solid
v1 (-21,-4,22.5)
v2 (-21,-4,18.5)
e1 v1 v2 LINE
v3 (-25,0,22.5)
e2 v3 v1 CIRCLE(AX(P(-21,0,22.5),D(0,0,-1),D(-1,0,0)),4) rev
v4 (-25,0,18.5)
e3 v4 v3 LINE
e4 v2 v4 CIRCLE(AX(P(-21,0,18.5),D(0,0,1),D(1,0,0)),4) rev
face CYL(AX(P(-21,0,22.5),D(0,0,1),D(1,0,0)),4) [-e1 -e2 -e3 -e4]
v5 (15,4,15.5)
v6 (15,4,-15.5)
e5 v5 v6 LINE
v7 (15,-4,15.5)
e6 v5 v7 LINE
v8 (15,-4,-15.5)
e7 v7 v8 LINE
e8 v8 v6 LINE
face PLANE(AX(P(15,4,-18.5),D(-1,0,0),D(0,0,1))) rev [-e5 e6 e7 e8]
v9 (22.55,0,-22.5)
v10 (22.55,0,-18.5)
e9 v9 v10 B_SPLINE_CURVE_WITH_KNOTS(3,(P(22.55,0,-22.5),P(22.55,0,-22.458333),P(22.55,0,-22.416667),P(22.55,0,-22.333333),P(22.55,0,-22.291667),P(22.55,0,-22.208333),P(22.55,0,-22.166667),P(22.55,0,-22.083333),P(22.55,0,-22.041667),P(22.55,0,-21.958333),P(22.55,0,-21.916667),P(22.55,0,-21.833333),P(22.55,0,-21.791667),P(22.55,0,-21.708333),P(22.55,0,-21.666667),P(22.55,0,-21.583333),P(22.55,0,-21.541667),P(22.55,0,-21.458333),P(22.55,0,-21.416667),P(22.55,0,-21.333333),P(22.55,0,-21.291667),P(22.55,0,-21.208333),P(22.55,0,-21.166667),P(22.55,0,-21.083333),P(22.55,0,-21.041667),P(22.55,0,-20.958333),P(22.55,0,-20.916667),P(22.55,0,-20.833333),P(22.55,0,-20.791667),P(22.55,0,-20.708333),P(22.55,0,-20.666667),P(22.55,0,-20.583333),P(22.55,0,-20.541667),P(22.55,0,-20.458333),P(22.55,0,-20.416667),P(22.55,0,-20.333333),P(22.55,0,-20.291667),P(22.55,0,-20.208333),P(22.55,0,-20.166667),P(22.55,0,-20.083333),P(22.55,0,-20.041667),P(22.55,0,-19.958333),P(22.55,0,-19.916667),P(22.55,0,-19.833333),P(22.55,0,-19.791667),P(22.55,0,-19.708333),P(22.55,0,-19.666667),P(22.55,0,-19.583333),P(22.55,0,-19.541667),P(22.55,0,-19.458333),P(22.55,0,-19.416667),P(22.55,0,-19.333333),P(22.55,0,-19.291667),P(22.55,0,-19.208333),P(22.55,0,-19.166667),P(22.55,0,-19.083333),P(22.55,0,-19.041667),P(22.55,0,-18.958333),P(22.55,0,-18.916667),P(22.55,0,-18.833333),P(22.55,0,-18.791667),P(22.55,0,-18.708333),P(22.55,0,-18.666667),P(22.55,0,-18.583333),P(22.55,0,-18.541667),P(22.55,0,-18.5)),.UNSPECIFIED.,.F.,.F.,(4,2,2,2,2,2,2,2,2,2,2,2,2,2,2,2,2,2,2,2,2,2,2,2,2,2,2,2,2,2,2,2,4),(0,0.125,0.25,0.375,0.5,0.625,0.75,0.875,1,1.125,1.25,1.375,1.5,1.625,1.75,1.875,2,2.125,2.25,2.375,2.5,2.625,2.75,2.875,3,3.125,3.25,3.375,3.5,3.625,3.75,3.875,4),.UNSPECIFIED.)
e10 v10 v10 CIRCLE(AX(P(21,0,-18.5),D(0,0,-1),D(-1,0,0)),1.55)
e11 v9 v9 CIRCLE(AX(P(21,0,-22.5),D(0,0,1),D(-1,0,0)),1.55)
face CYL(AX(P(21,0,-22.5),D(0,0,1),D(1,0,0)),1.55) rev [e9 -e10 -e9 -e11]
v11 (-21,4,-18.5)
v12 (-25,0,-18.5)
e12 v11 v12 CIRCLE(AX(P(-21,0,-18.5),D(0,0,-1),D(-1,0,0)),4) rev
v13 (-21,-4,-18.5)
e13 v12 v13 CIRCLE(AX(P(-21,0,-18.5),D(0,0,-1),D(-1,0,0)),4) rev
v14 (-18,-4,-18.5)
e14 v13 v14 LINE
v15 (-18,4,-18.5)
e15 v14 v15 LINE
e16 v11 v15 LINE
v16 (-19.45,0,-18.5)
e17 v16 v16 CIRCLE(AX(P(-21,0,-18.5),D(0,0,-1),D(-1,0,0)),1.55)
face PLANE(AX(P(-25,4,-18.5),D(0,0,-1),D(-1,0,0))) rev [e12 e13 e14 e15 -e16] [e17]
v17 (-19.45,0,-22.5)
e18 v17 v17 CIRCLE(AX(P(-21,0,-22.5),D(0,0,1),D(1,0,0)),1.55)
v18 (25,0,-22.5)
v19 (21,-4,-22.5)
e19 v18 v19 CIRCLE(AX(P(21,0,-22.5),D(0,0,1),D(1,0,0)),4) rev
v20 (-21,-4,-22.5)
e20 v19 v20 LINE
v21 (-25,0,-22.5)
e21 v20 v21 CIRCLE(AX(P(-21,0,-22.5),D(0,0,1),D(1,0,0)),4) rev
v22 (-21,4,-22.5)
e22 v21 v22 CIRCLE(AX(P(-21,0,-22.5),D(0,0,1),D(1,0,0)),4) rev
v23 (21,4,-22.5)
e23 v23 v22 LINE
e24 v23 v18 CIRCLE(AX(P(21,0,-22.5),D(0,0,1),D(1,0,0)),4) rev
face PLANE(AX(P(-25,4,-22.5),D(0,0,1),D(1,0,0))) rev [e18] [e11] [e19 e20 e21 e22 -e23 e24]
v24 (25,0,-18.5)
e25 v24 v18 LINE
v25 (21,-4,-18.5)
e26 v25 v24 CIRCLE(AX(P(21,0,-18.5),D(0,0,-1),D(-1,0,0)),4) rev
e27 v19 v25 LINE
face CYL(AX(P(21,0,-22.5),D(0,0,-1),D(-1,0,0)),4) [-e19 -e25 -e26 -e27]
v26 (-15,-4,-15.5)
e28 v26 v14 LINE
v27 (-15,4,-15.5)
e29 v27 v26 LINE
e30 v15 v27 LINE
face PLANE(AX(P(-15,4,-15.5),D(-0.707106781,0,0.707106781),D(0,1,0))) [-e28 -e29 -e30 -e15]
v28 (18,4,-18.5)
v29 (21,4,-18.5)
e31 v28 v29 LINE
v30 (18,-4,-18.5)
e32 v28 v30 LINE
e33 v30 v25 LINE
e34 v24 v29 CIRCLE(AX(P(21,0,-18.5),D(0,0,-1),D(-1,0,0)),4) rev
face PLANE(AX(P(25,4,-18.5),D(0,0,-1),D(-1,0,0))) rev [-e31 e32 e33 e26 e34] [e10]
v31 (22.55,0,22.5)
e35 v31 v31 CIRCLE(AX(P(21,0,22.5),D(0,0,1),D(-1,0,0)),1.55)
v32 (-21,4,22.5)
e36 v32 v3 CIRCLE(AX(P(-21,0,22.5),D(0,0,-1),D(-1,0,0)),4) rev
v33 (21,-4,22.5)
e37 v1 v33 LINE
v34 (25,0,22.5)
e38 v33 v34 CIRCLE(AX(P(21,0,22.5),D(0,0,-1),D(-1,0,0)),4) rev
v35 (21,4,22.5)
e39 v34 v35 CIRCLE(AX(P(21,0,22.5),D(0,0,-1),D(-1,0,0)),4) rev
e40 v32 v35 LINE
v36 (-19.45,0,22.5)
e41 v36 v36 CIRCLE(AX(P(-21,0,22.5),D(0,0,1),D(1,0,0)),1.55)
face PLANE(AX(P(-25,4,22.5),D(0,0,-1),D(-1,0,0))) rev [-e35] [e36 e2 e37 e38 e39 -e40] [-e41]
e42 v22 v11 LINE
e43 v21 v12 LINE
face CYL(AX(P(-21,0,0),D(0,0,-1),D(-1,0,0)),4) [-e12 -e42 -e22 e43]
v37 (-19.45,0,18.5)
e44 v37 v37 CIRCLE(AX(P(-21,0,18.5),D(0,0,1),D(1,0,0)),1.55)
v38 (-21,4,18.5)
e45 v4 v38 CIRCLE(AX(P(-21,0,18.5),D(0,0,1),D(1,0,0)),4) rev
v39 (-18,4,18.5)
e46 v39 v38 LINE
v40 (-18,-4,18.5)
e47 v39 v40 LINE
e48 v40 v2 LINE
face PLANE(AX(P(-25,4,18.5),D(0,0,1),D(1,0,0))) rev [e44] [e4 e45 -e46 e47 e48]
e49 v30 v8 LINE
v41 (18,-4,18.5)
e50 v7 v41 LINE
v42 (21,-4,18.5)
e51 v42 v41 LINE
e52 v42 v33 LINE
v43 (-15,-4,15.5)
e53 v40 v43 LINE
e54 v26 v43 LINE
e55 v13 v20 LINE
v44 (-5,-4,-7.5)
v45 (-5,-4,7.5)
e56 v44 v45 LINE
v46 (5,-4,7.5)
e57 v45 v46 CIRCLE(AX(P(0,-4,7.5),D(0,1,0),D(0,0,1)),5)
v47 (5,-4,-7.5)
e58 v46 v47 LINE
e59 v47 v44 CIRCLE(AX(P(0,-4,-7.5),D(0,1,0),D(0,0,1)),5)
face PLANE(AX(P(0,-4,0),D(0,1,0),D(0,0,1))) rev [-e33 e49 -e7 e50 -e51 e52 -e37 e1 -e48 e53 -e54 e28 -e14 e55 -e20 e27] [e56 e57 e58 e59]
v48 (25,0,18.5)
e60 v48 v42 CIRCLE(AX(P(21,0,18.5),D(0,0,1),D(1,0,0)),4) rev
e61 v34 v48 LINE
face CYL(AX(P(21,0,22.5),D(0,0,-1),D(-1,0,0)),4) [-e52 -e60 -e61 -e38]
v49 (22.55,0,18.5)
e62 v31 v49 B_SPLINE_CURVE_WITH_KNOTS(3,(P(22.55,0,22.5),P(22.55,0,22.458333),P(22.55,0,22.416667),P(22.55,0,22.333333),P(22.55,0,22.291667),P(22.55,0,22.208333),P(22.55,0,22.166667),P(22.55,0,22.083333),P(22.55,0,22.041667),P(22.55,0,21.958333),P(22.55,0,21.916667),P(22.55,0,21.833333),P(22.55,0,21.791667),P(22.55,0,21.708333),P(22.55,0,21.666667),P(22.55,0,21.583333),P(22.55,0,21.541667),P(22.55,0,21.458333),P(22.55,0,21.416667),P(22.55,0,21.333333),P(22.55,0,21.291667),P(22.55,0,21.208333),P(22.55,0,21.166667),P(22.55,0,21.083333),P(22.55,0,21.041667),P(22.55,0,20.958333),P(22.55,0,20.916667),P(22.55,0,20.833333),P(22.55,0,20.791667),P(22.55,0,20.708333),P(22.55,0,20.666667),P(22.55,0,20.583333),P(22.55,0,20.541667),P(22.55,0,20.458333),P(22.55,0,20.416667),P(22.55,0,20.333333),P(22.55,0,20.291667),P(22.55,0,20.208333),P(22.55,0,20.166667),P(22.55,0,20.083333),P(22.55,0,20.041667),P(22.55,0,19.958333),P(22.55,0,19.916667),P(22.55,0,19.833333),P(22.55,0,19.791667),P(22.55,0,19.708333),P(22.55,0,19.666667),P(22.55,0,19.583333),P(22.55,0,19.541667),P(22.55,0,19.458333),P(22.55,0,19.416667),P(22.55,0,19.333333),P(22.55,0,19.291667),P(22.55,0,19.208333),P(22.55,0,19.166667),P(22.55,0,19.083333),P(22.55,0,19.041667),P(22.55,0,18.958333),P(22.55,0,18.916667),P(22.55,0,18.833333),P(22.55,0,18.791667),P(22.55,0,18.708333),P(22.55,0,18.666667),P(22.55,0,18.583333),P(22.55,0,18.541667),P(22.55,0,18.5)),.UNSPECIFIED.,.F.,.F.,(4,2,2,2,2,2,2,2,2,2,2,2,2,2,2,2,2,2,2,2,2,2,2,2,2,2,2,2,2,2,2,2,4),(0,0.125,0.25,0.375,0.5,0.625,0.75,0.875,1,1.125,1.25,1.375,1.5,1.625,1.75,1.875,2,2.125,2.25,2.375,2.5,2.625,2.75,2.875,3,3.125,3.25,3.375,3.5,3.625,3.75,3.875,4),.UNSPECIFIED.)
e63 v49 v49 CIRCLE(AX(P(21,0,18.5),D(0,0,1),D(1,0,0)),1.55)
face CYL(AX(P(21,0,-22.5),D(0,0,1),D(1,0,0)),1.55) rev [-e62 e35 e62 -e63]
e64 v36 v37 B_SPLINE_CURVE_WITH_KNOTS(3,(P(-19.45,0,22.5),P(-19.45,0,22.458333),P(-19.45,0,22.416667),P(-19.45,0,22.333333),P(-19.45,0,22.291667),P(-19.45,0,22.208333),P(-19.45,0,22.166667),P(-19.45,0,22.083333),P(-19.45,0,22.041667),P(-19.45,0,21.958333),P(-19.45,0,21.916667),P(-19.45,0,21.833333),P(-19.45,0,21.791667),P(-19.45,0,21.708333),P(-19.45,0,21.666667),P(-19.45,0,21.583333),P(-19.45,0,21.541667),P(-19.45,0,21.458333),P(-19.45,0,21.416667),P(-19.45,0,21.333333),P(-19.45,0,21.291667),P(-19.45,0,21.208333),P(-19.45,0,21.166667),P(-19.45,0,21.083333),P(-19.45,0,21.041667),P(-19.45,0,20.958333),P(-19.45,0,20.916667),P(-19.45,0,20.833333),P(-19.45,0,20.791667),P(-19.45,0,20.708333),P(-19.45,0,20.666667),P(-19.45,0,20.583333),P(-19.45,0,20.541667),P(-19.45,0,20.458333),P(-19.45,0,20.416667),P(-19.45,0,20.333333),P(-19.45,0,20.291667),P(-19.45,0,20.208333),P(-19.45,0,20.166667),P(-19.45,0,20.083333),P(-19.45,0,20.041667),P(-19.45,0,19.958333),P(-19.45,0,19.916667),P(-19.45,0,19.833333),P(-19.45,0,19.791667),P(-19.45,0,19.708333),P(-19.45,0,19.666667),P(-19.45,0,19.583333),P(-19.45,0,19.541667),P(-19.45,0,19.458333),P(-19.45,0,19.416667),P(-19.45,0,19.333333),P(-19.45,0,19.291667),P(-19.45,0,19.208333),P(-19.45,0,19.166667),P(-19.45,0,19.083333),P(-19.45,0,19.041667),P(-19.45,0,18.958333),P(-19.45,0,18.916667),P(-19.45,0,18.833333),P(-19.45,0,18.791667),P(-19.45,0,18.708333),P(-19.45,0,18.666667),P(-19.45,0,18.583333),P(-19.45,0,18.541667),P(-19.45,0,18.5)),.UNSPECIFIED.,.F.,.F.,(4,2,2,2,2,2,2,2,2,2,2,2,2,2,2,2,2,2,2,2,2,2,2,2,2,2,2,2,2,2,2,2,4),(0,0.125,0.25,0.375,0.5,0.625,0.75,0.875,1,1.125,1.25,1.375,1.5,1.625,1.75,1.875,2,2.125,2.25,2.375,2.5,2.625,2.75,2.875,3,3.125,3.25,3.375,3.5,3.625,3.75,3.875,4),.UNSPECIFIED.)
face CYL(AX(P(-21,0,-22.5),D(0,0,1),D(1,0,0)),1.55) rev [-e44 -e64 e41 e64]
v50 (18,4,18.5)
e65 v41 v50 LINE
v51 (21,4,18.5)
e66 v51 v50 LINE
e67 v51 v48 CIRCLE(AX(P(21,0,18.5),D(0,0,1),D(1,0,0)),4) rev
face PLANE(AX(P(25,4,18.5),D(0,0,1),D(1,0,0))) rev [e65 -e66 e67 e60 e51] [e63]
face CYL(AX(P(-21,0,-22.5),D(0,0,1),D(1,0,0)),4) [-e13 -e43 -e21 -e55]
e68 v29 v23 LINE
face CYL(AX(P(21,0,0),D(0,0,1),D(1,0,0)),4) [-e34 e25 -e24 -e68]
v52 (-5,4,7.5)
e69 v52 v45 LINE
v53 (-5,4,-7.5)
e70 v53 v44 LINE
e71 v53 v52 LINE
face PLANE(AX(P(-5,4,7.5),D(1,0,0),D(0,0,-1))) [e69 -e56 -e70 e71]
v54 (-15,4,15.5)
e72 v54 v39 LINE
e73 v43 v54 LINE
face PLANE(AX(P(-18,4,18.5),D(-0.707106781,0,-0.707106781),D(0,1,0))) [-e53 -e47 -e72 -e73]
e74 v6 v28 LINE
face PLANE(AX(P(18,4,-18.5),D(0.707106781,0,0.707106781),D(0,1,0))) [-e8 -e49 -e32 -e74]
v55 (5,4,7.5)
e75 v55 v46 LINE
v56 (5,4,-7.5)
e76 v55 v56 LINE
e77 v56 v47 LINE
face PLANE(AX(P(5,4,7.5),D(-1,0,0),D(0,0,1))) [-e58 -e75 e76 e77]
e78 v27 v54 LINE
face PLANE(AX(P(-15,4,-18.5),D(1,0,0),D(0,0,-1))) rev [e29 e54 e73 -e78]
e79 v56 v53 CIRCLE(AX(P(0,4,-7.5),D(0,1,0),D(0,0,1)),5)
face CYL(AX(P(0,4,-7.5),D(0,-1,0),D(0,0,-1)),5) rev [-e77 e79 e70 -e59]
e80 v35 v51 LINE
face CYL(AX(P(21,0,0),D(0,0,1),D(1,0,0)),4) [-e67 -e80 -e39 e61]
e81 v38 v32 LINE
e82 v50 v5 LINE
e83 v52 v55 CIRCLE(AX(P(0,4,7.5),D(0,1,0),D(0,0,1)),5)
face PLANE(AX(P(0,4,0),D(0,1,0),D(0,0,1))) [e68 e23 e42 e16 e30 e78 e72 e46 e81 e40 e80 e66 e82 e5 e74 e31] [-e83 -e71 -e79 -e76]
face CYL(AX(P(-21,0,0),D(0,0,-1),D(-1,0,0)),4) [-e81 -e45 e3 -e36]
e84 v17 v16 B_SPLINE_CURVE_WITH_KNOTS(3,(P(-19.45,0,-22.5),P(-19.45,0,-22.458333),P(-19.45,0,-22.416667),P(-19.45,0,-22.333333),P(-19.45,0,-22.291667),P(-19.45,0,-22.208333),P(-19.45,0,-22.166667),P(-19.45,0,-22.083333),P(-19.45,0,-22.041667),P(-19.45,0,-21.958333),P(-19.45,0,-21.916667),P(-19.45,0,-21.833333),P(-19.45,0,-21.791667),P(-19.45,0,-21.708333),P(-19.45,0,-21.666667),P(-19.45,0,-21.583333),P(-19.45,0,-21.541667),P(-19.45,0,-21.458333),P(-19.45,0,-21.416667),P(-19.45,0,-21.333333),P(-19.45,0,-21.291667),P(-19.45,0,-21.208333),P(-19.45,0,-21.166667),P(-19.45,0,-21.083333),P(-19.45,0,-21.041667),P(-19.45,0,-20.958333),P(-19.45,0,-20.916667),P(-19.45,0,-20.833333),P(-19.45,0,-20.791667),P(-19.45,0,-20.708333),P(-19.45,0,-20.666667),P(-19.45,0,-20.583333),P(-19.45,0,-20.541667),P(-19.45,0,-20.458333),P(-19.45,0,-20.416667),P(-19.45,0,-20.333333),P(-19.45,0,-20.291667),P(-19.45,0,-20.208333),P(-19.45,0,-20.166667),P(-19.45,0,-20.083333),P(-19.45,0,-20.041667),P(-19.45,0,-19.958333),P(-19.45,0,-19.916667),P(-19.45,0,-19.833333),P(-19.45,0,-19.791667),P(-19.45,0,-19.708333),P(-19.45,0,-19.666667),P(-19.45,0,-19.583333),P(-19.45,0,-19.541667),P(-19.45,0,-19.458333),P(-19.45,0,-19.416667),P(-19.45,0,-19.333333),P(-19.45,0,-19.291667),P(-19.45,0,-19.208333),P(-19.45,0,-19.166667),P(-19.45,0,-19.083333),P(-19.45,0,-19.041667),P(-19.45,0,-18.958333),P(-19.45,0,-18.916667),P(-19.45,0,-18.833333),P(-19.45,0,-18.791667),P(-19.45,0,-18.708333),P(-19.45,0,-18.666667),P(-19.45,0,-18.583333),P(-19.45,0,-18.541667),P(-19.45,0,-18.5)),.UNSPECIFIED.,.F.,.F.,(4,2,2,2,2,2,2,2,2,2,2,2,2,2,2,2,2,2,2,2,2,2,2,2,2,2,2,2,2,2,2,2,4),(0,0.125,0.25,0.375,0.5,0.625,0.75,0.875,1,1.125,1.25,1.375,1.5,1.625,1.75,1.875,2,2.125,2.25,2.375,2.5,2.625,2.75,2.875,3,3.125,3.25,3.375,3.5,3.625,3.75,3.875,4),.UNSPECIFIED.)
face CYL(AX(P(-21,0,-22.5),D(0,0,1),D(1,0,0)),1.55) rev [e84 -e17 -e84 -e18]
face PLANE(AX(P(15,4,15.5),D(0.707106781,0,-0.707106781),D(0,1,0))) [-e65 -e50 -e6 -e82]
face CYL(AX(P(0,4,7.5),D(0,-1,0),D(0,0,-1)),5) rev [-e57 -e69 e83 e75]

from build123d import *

# Parameters (mm, degrees)
BOSS_EXTRUDE1_DEPTH     = 4
CHAMFER1_SIZE           = 3
CUT_EXTRUDE1_DEPTH      = 34.871079109
CUT_EXTRUDE1_DEPTH_BACK = 34.871079109
SKETCH3_R               = 1.55
FILLET1_R               = 4


with BuildPart() as part:
    # Sketch1 → Boss-Extrude1 (new, symmetric)
    with BuildSketch(Plane(origin=(0, 0, 0), x_dir=(1, 0, 0), z_dir=(0, 1, 0))):
        Polygon((-25, 22.5), (25, 22.5), (25, 18.5), (15, 18.5), (15, -18.5), (25, -18.5), (25, -22.5), (-25, -22.5), (-25, -18.5), (-15, -18.5), (-15, 18.5), (-25, 18.5), align=None)
        with BuildLine():
            Line((-5, -7.5), (-5, 7.5))
            ThreePointArc((-5, 7.5), (0, 12.5), (5, 7.5))
            Line((5, 7.5), (5, -7.5))
            ThreePointArc((5, -7.5), (0, -12.5), (-5, -7.5))
        make_face(mode=Mode.SUBTRACT)
    extrude(amount=BOSS_EXTRUDE1_DEPTH, both=True)

    # Chamfer1
    chamfer1_edges = [part.edges().sort_by_distance(p)[0] for p in [
        (-15, 0, 18.5),
        (-15, 0, -18.5),
        (15, 0, -18.5),
        (15, 0, 18.5),
    ]]
    chamfer(chamfer1_edges, length=CHAMFER1_SIZE)

    # Sketch3 → Cut-Extrude1 (cut, two sides: drawn at the far end of the back side and taken through both)
    with BuildSketch(Plane.XY.offset(-CUT_EXTRUDE1_DEPTH_BACK)):
        with Locations((-21, 0)):
            Circle(SKETCH3_R)
        with Locations((21, 0)):
            Circle(SKETCH3_R)
    extrude(amount=CUT_EXTRUDE1_DEPTH + CUT_EXTRUDE1_DEPTH_BACK, mode=Mode.SUBTRACT)

    # Fillet1
    fillet1_edges = [part.edges().sort_by_distance(p)[0] for p in [
        (25, -4, 20.5),
        (-25, -4, 20.5),
        (-25, 4, 20.5),
        (25, 4, 20.5),
        (25, -4, -20.5),
        (25, 4, -20.5),
        (-25, -4, -20.5),
        (-25, 4, -20.5),
    ]]
    fillet(fillet1_edges, radius=FILLET1_R - 0.0001)  # a hair under: the kernel refuses the full size


solid = part.part
